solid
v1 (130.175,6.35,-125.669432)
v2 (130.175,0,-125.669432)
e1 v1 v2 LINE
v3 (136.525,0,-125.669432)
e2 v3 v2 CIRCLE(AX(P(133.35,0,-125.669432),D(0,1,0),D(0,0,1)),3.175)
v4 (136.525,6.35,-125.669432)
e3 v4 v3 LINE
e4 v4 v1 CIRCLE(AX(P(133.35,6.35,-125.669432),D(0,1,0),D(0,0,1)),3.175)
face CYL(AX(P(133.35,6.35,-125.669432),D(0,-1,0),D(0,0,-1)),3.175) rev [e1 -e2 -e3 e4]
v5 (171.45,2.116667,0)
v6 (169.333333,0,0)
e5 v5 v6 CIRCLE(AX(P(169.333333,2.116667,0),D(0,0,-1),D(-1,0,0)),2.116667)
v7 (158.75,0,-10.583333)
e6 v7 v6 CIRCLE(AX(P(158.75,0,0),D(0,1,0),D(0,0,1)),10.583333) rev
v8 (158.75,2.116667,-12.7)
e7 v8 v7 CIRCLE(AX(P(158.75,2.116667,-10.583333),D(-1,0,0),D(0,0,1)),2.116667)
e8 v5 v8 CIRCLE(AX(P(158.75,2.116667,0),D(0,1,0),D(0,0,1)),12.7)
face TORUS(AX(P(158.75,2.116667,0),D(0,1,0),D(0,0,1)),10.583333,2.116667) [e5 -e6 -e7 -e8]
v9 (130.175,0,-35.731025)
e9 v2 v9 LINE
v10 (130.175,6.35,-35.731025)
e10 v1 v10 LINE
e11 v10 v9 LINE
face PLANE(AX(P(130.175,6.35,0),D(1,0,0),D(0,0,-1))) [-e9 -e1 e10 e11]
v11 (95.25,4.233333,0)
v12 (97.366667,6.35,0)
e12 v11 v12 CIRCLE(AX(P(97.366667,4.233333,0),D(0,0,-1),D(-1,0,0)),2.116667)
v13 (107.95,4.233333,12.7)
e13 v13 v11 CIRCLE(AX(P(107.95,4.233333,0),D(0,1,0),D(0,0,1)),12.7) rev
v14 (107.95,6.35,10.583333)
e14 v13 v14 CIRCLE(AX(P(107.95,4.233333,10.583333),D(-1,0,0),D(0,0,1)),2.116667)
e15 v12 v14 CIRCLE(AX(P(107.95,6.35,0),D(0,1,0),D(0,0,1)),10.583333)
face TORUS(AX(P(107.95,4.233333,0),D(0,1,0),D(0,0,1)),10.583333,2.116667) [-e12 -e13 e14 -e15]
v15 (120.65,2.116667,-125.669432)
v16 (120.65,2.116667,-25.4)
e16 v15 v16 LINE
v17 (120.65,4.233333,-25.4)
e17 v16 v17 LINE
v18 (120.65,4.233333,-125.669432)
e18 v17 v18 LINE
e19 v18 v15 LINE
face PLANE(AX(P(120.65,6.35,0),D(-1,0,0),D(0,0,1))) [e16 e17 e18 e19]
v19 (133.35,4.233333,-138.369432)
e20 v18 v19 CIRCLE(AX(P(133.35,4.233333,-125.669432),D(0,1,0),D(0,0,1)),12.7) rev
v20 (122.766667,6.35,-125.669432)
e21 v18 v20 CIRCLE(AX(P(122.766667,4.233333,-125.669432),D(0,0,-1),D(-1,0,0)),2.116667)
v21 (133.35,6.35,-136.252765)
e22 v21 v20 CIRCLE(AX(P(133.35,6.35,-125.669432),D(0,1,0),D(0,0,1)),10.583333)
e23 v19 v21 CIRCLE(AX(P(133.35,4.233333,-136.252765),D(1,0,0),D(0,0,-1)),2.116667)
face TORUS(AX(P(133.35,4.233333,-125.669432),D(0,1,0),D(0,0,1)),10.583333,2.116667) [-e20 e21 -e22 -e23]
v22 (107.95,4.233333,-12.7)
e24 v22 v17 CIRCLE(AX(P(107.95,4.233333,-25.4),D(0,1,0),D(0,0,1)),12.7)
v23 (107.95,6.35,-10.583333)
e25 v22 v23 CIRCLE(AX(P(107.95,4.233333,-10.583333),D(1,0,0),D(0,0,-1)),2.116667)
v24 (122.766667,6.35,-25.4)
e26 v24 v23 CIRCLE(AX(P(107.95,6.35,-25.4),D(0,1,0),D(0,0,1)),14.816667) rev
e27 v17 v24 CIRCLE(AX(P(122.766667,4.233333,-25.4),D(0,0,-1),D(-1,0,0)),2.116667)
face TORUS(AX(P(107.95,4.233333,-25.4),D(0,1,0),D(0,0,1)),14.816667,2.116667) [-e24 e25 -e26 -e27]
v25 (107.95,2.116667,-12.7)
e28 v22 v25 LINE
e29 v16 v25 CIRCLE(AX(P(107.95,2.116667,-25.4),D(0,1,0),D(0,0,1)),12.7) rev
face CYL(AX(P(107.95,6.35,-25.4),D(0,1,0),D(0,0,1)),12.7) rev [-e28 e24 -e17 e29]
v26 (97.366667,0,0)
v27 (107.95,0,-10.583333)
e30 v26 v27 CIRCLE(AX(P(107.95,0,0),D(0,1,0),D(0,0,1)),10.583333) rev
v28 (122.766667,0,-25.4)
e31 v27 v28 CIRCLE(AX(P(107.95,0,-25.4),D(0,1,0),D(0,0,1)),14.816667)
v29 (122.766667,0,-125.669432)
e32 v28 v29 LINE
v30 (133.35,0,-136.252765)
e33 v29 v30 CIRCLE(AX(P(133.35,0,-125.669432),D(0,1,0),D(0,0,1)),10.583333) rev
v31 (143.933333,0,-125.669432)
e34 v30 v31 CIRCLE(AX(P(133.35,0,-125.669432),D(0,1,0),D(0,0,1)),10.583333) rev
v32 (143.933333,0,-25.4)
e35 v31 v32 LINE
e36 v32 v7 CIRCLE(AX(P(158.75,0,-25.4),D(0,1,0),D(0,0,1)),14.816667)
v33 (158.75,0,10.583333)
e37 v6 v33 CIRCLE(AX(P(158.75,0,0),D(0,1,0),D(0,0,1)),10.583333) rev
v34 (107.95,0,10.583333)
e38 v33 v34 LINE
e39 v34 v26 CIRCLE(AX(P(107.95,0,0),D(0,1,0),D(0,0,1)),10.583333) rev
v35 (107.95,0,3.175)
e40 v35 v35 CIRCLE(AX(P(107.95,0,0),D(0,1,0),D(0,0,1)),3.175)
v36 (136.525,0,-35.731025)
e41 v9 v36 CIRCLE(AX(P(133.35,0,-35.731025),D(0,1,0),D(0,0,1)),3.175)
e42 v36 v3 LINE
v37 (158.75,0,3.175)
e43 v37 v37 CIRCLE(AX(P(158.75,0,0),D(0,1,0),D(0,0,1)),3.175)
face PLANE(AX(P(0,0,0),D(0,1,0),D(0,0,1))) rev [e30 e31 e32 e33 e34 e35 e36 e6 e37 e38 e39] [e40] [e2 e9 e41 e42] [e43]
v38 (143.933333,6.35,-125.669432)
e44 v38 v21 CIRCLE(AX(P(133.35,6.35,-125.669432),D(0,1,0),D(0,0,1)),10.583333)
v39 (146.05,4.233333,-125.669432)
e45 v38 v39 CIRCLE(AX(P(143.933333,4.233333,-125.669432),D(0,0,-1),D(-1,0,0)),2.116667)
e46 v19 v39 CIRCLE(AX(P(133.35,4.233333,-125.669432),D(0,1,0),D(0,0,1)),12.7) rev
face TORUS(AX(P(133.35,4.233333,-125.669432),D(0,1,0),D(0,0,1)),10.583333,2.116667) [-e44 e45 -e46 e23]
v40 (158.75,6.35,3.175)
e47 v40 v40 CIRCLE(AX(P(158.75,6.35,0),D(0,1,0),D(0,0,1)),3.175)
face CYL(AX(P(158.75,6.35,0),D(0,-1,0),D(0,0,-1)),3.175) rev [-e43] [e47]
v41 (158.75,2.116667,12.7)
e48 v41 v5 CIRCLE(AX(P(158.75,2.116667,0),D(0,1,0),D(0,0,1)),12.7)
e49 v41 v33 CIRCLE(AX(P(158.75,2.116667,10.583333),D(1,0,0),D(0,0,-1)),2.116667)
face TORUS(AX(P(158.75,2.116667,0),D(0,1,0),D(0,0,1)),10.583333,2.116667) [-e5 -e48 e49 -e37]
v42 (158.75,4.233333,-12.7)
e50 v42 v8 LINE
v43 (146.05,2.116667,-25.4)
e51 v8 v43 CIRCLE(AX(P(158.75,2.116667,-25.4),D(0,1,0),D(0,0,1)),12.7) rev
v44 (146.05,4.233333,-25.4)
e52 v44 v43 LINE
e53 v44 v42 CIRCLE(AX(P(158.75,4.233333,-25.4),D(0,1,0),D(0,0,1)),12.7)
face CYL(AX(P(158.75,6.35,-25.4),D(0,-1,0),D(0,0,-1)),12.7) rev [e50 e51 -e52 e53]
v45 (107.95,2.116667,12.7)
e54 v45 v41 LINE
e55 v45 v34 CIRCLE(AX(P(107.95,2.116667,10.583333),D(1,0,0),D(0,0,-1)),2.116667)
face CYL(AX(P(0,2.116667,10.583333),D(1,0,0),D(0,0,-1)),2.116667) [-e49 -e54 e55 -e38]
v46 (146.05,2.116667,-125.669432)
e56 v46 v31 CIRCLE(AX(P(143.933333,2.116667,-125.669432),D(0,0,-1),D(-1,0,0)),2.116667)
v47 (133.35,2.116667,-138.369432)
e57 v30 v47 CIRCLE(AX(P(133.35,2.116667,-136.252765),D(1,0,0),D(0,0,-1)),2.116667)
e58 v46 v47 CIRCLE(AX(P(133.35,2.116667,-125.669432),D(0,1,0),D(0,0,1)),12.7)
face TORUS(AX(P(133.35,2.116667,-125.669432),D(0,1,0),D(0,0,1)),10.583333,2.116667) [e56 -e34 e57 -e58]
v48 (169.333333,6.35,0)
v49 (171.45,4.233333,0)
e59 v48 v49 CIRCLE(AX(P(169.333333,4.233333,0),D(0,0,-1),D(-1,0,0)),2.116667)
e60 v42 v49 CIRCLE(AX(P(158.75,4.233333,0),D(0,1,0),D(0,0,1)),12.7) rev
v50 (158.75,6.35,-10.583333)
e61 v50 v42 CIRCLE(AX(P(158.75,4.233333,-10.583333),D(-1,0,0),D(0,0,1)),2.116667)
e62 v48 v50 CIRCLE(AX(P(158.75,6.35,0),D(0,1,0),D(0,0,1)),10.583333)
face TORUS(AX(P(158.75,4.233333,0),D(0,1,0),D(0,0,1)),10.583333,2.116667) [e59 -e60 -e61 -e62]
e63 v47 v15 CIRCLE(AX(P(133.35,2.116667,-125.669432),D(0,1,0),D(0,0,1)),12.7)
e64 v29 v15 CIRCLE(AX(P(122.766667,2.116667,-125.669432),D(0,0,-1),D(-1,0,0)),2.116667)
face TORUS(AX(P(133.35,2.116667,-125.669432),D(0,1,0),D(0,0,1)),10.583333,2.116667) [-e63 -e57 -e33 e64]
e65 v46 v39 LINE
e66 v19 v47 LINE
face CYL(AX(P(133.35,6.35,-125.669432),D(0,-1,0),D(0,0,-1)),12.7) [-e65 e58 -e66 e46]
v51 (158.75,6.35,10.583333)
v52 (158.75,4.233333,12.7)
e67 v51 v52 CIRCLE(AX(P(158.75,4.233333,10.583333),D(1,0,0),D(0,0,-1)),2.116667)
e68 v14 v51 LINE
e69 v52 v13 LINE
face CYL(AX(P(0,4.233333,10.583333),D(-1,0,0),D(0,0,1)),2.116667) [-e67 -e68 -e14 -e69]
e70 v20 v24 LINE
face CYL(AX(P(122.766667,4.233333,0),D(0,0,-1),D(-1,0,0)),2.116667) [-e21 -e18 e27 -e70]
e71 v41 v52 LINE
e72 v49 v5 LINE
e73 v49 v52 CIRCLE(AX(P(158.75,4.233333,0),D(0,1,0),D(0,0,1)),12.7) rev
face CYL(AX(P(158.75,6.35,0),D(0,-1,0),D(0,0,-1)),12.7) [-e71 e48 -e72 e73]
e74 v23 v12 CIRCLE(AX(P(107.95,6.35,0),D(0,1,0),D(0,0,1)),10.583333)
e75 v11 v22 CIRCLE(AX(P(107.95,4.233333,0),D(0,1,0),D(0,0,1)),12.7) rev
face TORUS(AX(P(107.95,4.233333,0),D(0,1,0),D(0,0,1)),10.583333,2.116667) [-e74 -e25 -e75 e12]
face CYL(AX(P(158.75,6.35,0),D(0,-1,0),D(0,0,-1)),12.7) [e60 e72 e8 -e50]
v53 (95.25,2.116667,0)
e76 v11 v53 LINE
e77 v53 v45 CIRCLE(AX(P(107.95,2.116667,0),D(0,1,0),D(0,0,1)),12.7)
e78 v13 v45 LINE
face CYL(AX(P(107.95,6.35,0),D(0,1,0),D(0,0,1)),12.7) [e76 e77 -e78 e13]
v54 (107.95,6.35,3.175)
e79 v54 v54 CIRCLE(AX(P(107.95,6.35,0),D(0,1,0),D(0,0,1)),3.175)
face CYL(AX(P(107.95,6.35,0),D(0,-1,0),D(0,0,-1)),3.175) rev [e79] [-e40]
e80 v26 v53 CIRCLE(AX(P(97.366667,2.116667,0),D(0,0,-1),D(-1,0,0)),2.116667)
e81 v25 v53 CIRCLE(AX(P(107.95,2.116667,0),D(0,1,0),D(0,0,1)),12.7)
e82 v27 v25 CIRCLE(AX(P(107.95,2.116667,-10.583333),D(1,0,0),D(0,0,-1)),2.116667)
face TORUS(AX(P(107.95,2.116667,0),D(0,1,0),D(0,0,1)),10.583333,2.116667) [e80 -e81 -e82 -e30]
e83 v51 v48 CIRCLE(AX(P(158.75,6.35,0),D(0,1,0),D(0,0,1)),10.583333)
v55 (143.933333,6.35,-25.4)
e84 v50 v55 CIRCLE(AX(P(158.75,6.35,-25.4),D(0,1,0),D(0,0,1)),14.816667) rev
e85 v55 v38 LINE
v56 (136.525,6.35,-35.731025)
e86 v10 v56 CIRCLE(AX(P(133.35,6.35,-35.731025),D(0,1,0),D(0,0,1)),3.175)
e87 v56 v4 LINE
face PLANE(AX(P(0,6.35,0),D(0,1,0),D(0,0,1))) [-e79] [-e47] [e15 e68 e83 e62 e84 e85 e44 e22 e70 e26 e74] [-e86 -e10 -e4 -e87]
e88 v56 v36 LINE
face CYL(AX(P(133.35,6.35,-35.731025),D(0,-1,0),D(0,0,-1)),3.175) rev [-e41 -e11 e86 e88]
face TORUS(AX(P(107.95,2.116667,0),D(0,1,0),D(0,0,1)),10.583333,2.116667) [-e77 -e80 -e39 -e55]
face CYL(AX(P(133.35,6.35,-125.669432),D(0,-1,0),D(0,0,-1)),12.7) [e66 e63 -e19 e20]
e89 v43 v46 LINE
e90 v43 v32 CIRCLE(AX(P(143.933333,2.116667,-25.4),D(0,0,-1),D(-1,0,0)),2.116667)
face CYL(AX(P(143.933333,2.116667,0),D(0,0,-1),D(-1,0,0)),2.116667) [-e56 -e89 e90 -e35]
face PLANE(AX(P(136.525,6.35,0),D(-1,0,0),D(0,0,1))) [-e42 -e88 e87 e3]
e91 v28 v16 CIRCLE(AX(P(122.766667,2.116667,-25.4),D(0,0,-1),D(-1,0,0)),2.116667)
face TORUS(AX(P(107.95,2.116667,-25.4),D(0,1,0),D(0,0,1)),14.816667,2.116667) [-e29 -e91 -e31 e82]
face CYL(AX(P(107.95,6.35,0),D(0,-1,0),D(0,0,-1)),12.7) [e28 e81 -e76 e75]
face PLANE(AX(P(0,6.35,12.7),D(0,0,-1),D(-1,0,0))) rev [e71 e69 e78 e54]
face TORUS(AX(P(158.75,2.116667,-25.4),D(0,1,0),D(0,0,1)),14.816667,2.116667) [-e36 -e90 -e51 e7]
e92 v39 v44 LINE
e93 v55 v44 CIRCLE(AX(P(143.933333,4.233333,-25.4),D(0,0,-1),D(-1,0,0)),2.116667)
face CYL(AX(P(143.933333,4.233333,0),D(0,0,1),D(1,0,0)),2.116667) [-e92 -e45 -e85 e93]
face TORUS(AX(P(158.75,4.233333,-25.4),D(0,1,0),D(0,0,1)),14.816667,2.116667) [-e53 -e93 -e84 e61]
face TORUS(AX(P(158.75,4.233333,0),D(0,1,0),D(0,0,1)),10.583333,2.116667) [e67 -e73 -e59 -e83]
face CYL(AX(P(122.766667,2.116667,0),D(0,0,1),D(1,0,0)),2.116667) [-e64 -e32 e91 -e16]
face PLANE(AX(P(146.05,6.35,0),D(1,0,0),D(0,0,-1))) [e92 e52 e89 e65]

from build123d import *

# Parameters (mm, degrees)
SKETCH1_R           = 3.175
BOSS_EXTRUDE1_DEPTH = 6.35
FILLET2_R           = 12.7
FILLET3_R           = 2.116666667


with BuildPart() as part:
    # Sketch1 → Boss-Extrude1 (new body)
    with BuildSketch(Plane(origin=(0, 0, 0), x_dir=(1, 0, 0), z_dir=(0, 1, 0))):
        Polygon((120.65, 138.369431979), (120.65, 12.7), (95.25, 12.7), (95.25, -12.7), (120.65, -12.7), (146.05, -12.7), (171.45, -12.7), (171.45, 12.7), (146.05, 12.7), (146.05, 138.369431979), align=None)
        with Locations(Location((107.95, 0, 0), (0, 0, 270))):
            Circle(SKETCH1_R, mode=Mode.SUBTRACT)
        with Locations(Location((158.75, 0, 0), (0, 0, 270))):
            Circle(SKETCH1_R, mode=Mode.SUBTRACT)
        with BuildLine():
            Line((130.175, 35.731024811), (130.175, 125.669431979))
            ThreePointArc((130.175, 125.669431979), (133.35, 128.844431979), (136.525, 125.669431979))
            Line((136.525, 125.669431979), (136.525, 35.731024811))
            ThreePointArc((136.525, 35.731024811), (133.35, 32.556024811), (130.175, 35.731024811))
        make_face(mode=Mode.SUBTRACT)
    extrude(amount=BOSS_EXTRUDE1_DEPTH)

    # Fillet2
    fillet2_edges = [part.edges().sort_by_distance(p)[0] for p in [
        (120.65, 3.175, -138.369431979),
        (146.05, 3.175, -138.369431979),
        (146.05, 3.175, -12.7),
        (171.45, 3.175, 12.7),
        (171.45, 3.175, -12.7),
        (95.25, 3.175, 12.7),
        (95.25, 3.175, -12.7),
        (120.65, 3.175, -12.7),
    ]]
    fillet(fillet2_edges, radius=FILLET2_R - 0.0001)  # a hair under: the kernel refuses the full size

    # Fillet3
    fillet3_edges = [part.edges().sort_by_distance(p)[0] for p in [
        (120.65, 0, -75.53471599),
        (120.65, 6.35, -75.53471599),
        (133.35, 0, 12.7),
        (146.05, 0, -75.53471599),
        (98.96971459, 0, -8.98028541),
        (98.96971459, 0, 8.98028541),
        (167.73028541, 0, -8.98028541),
        (167.73028541, 0, 8.98028541),
        (142.33028541, 0, -134.64971739),
        (124.36971459, 0, -134.64971739),
        (146.05, 6.35, -75.53471599),
        (133.35, 6.35, 12.7),
        (98.96971459, 6.35, -8.98028541),
        (98.96971459, 6.35, 8.98028541),
        (167.73028541, 6.35, -8.98028541),
        (167.73028541, 6.35, 8.98028541),
        (142.33028541, 6.35, -134.64971739),
        (124.36971459, 6.35, -134.64971739),
        (149.76971459, 0, -16.41971459),
        (149.76971459, 6.35, -16.41971459),
        (116.93028541, 0, -16.41971459),
        (116.93028541, 6.35, -16.41971459),
    ]]
    fillet(fillet3_edges, radius=FILLET3_R)


solid = part.part
